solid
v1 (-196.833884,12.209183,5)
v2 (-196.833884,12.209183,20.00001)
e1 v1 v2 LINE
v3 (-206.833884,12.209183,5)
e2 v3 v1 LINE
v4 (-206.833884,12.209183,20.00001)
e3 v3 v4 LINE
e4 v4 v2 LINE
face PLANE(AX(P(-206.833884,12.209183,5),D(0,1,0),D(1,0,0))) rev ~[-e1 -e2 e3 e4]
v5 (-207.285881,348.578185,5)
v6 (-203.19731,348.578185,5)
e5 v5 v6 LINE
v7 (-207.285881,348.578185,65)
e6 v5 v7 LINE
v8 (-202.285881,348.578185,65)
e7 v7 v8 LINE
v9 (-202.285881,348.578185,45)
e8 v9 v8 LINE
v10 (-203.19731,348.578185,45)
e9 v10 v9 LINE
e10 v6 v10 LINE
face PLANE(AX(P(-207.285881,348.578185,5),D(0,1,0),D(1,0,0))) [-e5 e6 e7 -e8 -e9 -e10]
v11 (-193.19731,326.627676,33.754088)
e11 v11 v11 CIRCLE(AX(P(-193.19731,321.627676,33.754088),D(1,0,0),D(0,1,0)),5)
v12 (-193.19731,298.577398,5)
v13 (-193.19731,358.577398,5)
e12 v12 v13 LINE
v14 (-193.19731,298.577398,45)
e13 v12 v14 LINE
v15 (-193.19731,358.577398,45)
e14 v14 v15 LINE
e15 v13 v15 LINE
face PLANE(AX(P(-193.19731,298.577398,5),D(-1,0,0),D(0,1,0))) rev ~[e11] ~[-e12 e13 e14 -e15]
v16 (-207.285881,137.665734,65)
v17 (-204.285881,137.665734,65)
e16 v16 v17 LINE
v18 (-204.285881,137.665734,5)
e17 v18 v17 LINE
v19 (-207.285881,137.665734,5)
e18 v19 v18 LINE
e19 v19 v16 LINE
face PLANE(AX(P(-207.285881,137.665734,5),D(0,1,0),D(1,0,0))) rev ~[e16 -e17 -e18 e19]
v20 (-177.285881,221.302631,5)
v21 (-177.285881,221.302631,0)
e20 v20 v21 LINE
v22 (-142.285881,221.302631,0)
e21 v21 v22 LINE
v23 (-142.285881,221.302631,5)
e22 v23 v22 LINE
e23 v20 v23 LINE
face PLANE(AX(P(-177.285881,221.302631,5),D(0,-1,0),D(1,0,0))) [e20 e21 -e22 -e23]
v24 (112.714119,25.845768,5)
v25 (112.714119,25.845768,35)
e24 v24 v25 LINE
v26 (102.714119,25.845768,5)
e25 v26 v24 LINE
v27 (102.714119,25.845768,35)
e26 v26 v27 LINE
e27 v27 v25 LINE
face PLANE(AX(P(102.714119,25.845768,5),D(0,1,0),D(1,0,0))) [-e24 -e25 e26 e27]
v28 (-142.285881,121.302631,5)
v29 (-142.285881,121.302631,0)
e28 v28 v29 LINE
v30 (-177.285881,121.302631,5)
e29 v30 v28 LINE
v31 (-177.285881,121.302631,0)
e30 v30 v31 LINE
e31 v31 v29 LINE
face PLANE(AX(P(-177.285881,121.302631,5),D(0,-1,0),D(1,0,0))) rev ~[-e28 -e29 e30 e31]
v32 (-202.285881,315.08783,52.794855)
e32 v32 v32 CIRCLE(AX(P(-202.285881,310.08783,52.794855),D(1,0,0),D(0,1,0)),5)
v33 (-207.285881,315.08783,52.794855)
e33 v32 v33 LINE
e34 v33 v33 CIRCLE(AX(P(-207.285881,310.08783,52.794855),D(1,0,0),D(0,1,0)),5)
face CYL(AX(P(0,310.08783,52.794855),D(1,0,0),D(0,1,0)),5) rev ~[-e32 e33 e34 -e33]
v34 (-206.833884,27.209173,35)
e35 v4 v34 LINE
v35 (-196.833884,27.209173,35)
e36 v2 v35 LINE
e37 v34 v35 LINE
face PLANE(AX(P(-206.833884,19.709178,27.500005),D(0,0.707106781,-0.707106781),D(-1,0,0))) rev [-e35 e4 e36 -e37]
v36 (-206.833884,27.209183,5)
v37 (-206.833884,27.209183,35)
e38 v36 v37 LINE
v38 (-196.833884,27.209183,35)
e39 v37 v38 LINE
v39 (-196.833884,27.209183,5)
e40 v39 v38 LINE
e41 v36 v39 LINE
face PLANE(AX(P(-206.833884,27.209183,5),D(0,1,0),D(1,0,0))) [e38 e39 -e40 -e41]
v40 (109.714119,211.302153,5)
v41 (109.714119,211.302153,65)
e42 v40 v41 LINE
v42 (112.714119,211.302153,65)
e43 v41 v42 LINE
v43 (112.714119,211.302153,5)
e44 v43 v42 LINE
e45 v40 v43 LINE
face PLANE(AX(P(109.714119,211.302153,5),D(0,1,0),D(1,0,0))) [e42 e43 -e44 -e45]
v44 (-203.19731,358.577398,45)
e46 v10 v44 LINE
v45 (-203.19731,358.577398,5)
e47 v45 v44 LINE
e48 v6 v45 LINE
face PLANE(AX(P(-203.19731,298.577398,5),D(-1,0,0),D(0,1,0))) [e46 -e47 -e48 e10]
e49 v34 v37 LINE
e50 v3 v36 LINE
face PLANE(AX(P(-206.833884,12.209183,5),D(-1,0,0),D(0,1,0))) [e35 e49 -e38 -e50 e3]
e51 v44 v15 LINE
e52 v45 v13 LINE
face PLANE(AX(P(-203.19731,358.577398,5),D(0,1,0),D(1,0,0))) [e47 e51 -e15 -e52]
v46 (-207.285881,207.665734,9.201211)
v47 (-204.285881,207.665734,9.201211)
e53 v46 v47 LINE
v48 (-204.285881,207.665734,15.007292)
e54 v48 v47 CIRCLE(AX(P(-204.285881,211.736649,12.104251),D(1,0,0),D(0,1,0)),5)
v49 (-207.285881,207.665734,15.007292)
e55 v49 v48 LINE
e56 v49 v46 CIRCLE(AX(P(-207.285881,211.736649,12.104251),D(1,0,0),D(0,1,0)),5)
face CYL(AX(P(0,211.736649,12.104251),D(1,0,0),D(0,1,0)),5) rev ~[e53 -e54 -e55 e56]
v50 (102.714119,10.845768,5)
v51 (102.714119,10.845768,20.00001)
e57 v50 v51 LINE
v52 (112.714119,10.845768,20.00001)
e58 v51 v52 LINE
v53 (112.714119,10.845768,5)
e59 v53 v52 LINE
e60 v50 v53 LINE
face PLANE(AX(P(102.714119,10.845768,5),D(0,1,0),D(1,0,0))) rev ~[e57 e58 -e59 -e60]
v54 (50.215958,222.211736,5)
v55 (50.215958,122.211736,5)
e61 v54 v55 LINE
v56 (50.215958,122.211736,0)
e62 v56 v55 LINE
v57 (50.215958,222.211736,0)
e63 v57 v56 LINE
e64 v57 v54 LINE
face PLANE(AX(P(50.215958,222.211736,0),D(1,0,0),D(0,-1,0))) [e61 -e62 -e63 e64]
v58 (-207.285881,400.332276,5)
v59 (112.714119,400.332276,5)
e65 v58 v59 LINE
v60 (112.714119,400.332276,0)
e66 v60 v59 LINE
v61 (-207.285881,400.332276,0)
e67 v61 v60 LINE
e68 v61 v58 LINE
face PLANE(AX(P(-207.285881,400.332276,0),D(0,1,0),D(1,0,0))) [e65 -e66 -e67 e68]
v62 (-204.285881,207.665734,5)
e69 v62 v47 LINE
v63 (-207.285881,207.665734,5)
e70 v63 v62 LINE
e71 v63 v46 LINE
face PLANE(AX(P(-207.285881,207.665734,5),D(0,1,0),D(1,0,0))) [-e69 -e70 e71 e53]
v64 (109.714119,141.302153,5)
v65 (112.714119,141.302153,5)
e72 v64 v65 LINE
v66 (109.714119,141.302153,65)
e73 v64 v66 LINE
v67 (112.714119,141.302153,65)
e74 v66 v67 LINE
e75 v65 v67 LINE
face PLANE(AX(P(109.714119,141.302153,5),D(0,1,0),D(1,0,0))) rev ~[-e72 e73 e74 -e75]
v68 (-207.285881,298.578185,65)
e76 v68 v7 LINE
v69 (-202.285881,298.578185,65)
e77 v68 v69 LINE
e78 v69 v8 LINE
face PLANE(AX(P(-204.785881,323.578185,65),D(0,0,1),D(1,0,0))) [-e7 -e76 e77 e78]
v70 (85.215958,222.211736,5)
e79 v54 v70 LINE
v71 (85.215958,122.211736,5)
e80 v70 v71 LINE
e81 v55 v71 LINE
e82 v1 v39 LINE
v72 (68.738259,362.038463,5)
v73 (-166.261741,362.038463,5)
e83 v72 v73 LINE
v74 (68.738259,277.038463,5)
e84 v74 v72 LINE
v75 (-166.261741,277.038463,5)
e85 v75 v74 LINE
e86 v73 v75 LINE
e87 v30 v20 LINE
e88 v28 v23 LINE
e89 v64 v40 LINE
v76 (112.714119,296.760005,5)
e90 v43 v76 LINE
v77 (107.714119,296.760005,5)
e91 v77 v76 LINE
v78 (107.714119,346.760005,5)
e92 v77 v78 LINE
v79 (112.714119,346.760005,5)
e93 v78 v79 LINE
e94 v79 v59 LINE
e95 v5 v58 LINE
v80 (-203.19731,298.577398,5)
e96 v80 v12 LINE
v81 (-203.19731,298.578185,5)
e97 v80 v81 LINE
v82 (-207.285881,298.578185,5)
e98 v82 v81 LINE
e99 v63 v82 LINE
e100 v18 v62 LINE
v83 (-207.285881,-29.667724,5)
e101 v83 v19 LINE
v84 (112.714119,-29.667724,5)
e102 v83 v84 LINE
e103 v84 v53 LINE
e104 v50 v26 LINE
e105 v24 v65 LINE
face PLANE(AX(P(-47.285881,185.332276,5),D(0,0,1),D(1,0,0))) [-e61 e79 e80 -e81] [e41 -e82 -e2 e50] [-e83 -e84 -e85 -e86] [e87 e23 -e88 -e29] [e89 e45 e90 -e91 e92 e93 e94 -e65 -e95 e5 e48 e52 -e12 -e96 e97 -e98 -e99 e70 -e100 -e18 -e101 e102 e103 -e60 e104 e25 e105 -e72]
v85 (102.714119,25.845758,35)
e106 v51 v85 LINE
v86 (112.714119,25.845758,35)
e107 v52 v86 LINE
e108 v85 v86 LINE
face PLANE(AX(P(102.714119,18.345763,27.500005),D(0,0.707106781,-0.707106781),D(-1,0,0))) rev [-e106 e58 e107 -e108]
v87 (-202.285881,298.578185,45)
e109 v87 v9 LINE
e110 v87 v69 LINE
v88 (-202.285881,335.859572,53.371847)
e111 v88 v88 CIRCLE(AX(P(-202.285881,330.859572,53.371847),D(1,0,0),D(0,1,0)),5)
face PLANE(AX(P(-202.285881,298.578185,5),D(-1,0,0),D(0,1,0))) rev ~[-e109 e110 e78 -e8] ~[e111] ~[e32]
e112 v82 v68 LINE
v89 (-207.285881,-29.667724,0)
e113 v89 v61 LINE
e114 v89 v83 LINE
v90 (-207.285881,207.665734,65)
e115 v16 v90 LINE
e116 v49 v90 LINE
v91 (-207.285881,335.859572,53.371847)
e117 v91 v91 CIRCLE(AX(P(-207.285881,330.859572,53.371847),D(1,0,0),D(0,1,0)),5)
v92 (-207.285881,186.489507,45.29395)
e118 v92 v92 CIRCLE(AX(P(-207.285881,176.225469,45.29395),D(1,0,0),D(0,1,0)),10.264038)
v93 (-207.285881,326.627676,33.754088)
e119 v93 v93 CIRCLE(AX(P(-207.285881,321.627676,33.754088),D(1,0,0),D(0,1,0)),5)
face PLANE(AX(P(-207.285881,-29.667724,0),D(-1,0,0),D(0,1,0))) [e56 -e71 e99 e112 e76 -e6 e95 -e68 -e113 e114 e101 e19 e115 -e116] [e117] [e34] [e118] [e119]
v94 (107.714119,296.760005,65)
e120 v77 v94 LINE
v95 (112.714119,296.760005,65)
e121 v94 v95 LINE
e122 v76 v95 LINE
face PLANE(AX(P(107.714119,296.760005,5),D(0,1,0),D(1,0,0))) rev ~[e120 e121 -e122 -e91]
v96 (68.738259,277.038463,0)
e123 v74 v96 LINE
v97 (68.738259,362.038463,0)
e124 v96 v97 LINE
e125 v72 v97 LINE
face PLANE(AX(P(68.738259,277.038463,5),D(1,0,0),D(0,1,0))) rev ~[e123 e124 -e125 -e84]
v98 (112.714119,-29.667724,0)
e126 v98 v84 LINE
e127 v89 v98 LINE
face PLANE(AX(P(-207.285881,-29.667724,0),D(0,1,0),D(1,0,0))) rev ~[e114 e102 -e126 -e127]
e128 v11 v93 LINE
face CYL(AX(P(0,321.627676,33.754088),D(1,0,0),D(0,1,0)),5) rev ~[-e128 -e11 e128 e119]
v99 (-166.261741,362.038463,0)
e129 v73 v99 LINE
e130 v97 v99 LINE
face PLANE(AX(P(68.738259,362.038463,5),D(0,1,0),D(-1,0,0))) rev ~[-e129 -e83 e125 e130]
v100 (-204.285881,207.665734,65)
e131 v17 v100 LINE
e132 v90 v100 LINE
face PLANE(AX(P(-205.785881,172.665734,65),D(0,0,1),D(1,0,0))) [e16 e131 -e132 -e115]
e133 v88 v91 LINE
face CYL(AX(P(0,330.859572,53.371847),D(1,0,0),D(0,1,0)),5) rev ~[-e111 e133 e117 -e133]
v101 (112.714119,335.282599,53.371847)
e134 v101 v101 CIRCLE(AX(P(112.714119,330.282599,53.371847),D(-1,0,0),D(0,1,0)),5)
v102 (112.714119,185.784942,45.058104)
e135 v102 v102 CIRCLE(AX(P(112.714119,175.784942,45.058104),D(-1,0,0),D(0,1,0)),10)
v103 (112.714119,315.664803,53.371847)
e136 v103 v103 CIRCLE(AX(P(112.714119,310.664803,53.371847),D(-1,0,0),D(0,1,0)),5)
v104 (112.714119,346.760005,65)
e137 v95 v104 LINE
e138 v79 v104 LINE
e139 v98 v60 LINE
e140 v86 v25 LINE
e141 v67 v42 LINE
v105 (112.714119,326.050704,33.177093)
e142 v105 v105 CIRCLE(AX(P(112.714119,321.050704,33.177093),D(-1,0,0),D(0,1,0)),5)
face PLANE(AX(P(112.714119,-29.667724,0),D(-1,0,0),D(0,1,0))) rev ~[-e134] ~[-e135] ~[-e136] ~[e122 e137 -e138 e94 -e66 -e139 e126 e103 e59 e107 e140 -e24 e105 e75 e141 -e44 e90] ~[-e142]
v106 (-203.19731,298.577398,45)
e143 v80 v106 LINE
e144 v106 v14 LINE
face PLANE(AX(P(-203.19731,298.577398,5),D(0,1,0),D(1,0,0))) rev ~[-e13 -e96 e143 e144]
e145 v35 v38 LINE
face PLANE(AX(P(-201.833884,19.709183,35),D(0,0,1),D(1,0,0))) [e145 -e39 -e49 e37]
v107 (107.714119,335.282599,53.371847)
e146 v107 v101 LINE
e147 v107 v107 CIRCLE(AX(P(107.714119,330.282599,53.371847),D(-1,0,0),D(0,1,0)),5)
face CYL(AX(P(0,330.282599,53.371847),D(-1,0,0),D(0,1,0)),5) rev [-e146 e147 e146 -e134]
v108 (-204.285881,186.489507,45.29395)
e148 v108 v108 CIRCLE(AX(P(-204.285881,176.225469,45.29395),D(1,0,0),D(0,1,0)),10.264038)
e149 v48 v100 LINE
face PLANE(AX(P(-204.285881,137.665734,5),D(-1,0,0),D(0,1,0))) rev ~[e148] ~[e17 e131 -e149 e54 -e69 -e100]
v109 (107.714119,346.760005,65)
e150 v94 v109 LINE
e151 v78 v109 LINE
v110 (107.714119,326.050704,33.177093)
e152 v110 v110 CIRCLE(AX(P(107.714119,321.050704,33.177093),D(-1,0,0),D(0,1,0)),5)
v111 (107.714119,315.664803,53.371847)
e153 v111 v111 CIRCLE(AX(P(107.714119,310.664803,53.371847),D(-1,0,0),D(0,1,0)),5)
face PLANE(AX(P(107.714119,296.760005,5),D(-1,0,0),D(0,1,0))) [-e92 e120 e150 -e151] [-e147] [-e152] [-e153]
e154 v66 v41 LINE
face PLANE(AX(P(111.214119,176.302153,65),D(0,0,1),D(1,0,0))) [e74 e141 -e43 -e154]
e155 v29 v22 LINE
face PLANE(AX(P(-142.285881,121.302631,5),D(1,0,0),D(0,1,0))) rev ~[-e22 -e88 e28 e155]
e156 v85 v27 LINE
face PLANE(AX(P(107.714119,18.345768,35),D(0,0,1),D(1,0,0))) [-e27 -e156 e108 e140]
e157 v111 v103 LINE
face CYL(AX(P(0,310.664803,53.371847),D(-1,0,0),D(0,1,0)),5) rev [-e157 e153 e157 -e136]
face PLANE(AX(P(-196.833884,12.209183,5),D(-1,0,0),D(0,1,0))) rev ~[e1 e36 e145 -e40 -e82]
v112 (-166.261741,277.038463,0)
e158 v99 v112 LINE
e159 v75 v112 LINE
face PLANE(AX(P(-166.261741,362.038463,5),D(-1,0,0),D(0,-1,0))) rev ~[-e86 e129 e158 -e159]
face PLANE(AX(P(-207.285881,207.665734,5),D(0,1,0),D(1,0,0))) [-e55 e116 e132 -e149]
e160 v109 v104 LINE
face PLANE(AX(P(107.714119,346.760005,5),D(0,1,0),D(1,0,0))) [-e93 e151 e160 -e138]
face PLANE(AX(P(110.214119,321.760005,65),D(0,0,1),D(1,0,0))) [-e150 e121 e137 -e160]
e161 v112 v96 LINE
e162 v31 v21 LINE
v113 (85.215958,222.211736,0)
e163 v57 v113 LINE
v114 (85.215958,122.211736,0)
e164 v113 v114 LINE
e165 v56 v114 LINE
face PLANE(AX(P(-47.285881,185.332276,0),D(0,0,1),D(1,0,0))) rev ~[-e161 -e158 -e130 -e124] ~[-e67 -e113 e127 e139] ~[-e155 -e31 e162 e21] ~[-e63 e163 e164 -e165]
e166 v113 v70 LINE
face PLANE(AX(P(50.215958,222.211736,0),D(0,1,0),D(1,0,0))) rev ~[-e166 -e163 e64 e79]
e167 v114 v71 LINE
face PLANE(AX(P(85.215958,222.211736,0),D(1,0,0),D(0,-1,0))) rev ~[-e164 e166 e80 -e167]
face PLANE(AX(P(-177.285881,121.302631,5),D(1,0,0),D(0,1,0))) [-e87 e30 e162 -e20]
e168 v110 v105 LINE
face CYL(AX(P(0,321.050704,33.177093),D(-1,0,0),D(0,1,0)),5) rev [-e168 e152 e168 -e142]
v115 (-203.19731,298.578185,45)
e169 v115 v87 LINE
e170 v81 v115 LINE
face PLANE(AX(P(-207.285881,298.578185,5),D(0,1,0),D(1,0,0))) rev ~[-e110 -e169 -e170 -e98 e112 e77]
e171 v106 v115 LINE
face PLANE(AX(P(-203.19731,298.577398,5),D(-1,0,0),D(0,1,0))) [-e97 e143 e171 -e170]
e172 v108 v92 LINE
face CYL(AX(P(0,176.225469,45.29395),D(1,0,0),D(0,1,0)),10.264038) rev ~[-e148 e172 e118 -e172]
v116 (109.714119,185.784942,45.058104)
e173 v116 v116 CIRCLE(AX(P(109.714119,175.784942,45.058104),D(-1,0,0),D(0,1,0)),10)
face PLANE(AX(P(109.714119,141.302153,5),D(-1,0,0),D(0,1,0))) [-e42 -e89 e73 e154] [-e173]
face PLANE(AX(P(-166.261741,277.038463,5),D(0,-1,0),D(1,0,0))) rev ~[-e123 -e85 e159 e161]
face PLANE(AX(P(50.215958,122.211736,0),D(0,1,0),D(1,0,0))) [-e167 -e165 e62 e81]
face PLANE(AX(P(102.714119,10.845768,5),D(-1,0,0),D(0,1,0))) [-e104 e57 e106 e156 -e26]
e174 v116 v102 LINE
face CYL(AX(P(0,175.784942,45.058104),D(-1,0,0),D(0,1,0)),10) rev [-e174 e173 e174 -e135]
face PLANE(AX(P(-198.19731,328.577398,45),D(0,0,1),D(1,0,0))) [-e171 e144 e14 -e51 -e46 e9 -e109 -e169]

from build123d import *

# Parameters (mm, degrees)
F0_W      = 320
F0_H      = 430
F1_DEPTH  = 5
F2_W      = 35
F2_H      = 100
F3_DEPTH  = 5
F4_W      = 35
F4_H      = 100
F5_DEPTH  = 5
F7_DEPTH  = 5
F8_W      = 3
F8_H      = 70
F9_DEPTH  = 60
F10_W     = 3
F10_H     = 70
F11_DEPTH = 60
F12_W     = 5
F12_H     = 50
F13_DEPTH = 60
F14_W     = 5
F14_H     = 50
F15_DEPTH = 60
F16_R     = 10
F17_DEPTH = 120
F18_R     = 10.2640382995
F19_DEPTH = 240
F20_W     = 10
F20_H     = 15
F21_DEPTH = 30
F22_SIZE  = 14.99999
F23_W     = 10
F23_H     = 15
F24_DEPTH = 30
F25_SIZE  = 14.99999
F26_W     = 10
F26_H     = 60
F27_DEPTH = 40
F28_R     = 5
F29_DEPTH = 240
F30_R     = 5
F31_DEPTH = 240
F32_R     = 5
F33_DEPTH = 250
F34_R     = 5
F35_DEPTH = 300
F36_R     = 5
F37_DEPTH = 300
F38_R     = 5
F39_DEPTH = 300
F40_R     = 10
F41_DEPTH = 207.2868810425
F42_R     = 5
F43_DEPTH = 207.2868810425
F44_R     = 5
F45_DEPTH = 207.2868810425
F46_R     = 5
F47_DEPTH = 207.2868810425
F48_R     = 5
F49_DEPTH = 207.2868810425


# Not quite as in the source:
# - a fillet or chamfer is up to 0.001 mm smaller than in the source, because OpenCascade refuses the exact size


with BuildPart() as f1:
    # F0 (on Top) → F1 (new body)
    with BuildSketch(Plane.XY):
        with Locations((-47.2858810425, 185.3322760761)):
            Rectangle(F0_W, F0_H)
    extrude(amount=F1_DEPTH)

    # F2 (on face) → F3 (cut)
    with BuildSketch(Plane.XY.offset(5)):
        with Locations((-159.7858810425, 171.3026314974)):
            Rectangle(F2_W, F2_H)
    extrude(amount=-F3_DEPTH, mode=Mode.SUBTRACT)

    # F4 (on face) → F5 (cut)
    with BuildSketch(Plane(origin=(0, 0, 0), x_dir=(1, 0, 0), z_dir=(0, 0, -1))):
        with Locations((67.7159577608, -172.2117364407)):
            Rectangle(F4_W, F4_H)
    extrude(amount=-F5_DEPTH, mode=Mode.SUBTRACT)

    # F6 (on face) → F7 (cut)
    with BuildSketch(Plane.XY.offset(5)):
        Polygon((68.7382593751, 362.0384633541), (-166.2617406249, 362.0384633541), (-166.2617406249, 277.0384633541), (-65.0134384632, 277.0384633541), (-48.7617406249, 277.0384633541), (68.7382593751, 277.0384633541), align=None)
    extrude(amount=-F7_DEPTH, mode=Mode.SUBTRACT)

    # F8 (on face) → F9 (join)
    with BuildSketch(Plane.XY.offset(5)):
        with Locations((-205.7858810425, 172.665733695)):
            Rectangle(F8_W, F8_H)
    extrude(amount=F9_DEPTH)

    # F10 (on face) → F11 (join)
    with BuildSketch(Plane.XY.offset(5)):
        with Locations((111.2141189575, 176.3021534681)):
            Rectangle(F10_W, F10_H)
    extrude(amount=F11_DEPTH)

    # F12 (on face) → F13 (join)
    with BuildSketch(Plane.XY.offset(5)):
        with Locations((-204.7858810425, 323.5781848431)):
            Rectangle(F12_W, F12_H)
    extrude(amount=F13_DEPTH)

    # F14 (on face) → F15 (join)
    with BuildSketch(Plane.XY.offset(5)):
        with Locations((110.2141189575, 321.7600047588)):
            Rectangle(F14_W, F14_H)
    extrude(amount=F15_DEPTH)

    # F16 (on Right) → F17 (cut)
    with BuildSketch(Plane.YZ):
        with Locations((175.784942263, 45.0581042336)):
            Circle(F16_R)
    extrude(amount=F17_DEPTH, mode=Mode.SUBTRACT)

    # F18 (on Right) → F19 (cut)
    with BuildSketch(Plane.YZ):
        with Locations((176.2254685163, 45.2939495444)):
            Circle(F18_R)
    extrude(amount=-F19_DEPTH, mode=Mode.SUBTRACT)

    # F20 (on face) → F21 (join)
    with BuildSketch(Plane.XY.offset(5)):
        with Locations((107.7141189575, 18.3457679302)):
            Rectangle(F20_W, F20_H)
    extrude(amount=F21_DEPTH)

    # F22 (size 15 in the source; OpenCascade refuses exactly that, so slightly less here)
    f22_edges = [f1.edges().sort_by_distance(p)[0] for p in [
        (107.714119, 10.845768, 35),
    ]]
    chamfer(f22_edges, length=F22_SIZE)

    # F23 (on face) → F24 (join)
    with BuildSketch(Plane.XY.offset(5)):
        with Locations((-201.83388412, 19.7091826051)):
            Rectangle(F23_W, F23_H)
    extrude(amount=F24_DEPTH)

    # F25 (size 15 in the source; OpenCascade refuses exactly that, so slightly less here)
    f25_edges = [f1.edges().sort_by_distance(p)[0] for p in [
        (-201.833884, 12.209183, 35),
    ]]
    chamfer(f25_edges, length=F25_SIZE)

    # F26 (on face) → F27 (join)
    with BuildSketch(Plane.XY.offset(5)):
        with Locations((-198.1973099709, 328.5773980618)):
            Rectangle(F26_W, F26_H)
    extrude(amount=F27_DEPTH)

    # F28 (on Right) → F29 (cut)
    with BuildSketch(Plane.YZ):
        with Locations((310.6648027897, 53.3718466759)):
            Circle(F28_R)
    extrude(amount=F29_DEPTH, mode=Mode.SUBTRACT)

    # F30 (on Right) → F31 (cut)
    with BuildSketch(Plane.YZ):
        with Locations((330.2825987339, 53.3718466759)):
            Circle(F30_R)
    extrude(amount=F31_DEPTH, mode=Mode.SUBTRACT)

    # F32 (on Right) → F33 (cut)
    with BuildSketch(Plane.YZ):
        with Locations((321.0507035255, 33.1770926714)):
            Circle(F32_R)
    extrude(amount=F33_DEPTH, mode=Mode.SUBTRACT)

    # F34 (on Right) → F35 (cut)
    with BuildSketch(Plane.YZ):
        with Locations((310.0878298283, 52.794855088)):
            Circle(F34_R)
    extrude(amount=-F35_DEPTH, mode=Mode.SUBTRACT)

    # F36 (on Right) → F37 (cut)
    with BuildSketch(Plane.YZ):
        with Locations((330.8595716953, 53.3718466759)):
            Circle(F36_R)
    extrude(amount=-F37_DEPTH, mode=Mode.SUBTRACT)

    # F38 (on Right) → F39 (cut)
    with BuildSketch(Plane.YZ):
        with Locations((321.627676487, 33.7540879846)):
            Circle(F38_R)
    extrude(amount=-F39_DEPTH, mode=Mode.SUBTRACT)

    # F40 (on Right) → F41 (cut, through all)
    with BuildSketch(Plane.YZ):
        with Locations((228.0015647411, 27.0902961493)):
            Circle(F40_R)
    extrude(amount=-F41_DEPTH, mode=Mode.SUBTRACT)

    # F42 (on Right) → F43 (cut, through all)
    with BuildSketch(Plane.YZ):
        with Locations((241.425678134, 41.8319888413)):
            Circle(F42_R)
    extrude(amount=-F43_DEPTH, mode=Mode.SUBTRACT)

    # F44 (on Right) → F45 (cut, through all)
    with BuildSketch(Plane.YZ):
        with Locations((240.8486753702, 12.9823405296)):
            Circle(F44_R)
    extrude(amount=-F45_DEPTH, mode=Mode.SUBTRACT)

    # F46 (on Right) → F47 (cut, through all)
    with BuildSketch(Plane.YZ):
        with Locations((213.0800783634, 41.6209772229)):
            Circle(F46_R)
    extrude(amount=-F47_DEPTH, mode=Mode.SUBTRACT)

    # F48 (on Right) → F49 (cut, through all)
    with BuildSketch(Plane.YZ):
        with Locations((211.7366492748, 12.104251422)):
            Circle(F48_R)
    extrude(amount=-F49_DEPTH, mode=Mode.SUBTRACT)


solid = f1.part
